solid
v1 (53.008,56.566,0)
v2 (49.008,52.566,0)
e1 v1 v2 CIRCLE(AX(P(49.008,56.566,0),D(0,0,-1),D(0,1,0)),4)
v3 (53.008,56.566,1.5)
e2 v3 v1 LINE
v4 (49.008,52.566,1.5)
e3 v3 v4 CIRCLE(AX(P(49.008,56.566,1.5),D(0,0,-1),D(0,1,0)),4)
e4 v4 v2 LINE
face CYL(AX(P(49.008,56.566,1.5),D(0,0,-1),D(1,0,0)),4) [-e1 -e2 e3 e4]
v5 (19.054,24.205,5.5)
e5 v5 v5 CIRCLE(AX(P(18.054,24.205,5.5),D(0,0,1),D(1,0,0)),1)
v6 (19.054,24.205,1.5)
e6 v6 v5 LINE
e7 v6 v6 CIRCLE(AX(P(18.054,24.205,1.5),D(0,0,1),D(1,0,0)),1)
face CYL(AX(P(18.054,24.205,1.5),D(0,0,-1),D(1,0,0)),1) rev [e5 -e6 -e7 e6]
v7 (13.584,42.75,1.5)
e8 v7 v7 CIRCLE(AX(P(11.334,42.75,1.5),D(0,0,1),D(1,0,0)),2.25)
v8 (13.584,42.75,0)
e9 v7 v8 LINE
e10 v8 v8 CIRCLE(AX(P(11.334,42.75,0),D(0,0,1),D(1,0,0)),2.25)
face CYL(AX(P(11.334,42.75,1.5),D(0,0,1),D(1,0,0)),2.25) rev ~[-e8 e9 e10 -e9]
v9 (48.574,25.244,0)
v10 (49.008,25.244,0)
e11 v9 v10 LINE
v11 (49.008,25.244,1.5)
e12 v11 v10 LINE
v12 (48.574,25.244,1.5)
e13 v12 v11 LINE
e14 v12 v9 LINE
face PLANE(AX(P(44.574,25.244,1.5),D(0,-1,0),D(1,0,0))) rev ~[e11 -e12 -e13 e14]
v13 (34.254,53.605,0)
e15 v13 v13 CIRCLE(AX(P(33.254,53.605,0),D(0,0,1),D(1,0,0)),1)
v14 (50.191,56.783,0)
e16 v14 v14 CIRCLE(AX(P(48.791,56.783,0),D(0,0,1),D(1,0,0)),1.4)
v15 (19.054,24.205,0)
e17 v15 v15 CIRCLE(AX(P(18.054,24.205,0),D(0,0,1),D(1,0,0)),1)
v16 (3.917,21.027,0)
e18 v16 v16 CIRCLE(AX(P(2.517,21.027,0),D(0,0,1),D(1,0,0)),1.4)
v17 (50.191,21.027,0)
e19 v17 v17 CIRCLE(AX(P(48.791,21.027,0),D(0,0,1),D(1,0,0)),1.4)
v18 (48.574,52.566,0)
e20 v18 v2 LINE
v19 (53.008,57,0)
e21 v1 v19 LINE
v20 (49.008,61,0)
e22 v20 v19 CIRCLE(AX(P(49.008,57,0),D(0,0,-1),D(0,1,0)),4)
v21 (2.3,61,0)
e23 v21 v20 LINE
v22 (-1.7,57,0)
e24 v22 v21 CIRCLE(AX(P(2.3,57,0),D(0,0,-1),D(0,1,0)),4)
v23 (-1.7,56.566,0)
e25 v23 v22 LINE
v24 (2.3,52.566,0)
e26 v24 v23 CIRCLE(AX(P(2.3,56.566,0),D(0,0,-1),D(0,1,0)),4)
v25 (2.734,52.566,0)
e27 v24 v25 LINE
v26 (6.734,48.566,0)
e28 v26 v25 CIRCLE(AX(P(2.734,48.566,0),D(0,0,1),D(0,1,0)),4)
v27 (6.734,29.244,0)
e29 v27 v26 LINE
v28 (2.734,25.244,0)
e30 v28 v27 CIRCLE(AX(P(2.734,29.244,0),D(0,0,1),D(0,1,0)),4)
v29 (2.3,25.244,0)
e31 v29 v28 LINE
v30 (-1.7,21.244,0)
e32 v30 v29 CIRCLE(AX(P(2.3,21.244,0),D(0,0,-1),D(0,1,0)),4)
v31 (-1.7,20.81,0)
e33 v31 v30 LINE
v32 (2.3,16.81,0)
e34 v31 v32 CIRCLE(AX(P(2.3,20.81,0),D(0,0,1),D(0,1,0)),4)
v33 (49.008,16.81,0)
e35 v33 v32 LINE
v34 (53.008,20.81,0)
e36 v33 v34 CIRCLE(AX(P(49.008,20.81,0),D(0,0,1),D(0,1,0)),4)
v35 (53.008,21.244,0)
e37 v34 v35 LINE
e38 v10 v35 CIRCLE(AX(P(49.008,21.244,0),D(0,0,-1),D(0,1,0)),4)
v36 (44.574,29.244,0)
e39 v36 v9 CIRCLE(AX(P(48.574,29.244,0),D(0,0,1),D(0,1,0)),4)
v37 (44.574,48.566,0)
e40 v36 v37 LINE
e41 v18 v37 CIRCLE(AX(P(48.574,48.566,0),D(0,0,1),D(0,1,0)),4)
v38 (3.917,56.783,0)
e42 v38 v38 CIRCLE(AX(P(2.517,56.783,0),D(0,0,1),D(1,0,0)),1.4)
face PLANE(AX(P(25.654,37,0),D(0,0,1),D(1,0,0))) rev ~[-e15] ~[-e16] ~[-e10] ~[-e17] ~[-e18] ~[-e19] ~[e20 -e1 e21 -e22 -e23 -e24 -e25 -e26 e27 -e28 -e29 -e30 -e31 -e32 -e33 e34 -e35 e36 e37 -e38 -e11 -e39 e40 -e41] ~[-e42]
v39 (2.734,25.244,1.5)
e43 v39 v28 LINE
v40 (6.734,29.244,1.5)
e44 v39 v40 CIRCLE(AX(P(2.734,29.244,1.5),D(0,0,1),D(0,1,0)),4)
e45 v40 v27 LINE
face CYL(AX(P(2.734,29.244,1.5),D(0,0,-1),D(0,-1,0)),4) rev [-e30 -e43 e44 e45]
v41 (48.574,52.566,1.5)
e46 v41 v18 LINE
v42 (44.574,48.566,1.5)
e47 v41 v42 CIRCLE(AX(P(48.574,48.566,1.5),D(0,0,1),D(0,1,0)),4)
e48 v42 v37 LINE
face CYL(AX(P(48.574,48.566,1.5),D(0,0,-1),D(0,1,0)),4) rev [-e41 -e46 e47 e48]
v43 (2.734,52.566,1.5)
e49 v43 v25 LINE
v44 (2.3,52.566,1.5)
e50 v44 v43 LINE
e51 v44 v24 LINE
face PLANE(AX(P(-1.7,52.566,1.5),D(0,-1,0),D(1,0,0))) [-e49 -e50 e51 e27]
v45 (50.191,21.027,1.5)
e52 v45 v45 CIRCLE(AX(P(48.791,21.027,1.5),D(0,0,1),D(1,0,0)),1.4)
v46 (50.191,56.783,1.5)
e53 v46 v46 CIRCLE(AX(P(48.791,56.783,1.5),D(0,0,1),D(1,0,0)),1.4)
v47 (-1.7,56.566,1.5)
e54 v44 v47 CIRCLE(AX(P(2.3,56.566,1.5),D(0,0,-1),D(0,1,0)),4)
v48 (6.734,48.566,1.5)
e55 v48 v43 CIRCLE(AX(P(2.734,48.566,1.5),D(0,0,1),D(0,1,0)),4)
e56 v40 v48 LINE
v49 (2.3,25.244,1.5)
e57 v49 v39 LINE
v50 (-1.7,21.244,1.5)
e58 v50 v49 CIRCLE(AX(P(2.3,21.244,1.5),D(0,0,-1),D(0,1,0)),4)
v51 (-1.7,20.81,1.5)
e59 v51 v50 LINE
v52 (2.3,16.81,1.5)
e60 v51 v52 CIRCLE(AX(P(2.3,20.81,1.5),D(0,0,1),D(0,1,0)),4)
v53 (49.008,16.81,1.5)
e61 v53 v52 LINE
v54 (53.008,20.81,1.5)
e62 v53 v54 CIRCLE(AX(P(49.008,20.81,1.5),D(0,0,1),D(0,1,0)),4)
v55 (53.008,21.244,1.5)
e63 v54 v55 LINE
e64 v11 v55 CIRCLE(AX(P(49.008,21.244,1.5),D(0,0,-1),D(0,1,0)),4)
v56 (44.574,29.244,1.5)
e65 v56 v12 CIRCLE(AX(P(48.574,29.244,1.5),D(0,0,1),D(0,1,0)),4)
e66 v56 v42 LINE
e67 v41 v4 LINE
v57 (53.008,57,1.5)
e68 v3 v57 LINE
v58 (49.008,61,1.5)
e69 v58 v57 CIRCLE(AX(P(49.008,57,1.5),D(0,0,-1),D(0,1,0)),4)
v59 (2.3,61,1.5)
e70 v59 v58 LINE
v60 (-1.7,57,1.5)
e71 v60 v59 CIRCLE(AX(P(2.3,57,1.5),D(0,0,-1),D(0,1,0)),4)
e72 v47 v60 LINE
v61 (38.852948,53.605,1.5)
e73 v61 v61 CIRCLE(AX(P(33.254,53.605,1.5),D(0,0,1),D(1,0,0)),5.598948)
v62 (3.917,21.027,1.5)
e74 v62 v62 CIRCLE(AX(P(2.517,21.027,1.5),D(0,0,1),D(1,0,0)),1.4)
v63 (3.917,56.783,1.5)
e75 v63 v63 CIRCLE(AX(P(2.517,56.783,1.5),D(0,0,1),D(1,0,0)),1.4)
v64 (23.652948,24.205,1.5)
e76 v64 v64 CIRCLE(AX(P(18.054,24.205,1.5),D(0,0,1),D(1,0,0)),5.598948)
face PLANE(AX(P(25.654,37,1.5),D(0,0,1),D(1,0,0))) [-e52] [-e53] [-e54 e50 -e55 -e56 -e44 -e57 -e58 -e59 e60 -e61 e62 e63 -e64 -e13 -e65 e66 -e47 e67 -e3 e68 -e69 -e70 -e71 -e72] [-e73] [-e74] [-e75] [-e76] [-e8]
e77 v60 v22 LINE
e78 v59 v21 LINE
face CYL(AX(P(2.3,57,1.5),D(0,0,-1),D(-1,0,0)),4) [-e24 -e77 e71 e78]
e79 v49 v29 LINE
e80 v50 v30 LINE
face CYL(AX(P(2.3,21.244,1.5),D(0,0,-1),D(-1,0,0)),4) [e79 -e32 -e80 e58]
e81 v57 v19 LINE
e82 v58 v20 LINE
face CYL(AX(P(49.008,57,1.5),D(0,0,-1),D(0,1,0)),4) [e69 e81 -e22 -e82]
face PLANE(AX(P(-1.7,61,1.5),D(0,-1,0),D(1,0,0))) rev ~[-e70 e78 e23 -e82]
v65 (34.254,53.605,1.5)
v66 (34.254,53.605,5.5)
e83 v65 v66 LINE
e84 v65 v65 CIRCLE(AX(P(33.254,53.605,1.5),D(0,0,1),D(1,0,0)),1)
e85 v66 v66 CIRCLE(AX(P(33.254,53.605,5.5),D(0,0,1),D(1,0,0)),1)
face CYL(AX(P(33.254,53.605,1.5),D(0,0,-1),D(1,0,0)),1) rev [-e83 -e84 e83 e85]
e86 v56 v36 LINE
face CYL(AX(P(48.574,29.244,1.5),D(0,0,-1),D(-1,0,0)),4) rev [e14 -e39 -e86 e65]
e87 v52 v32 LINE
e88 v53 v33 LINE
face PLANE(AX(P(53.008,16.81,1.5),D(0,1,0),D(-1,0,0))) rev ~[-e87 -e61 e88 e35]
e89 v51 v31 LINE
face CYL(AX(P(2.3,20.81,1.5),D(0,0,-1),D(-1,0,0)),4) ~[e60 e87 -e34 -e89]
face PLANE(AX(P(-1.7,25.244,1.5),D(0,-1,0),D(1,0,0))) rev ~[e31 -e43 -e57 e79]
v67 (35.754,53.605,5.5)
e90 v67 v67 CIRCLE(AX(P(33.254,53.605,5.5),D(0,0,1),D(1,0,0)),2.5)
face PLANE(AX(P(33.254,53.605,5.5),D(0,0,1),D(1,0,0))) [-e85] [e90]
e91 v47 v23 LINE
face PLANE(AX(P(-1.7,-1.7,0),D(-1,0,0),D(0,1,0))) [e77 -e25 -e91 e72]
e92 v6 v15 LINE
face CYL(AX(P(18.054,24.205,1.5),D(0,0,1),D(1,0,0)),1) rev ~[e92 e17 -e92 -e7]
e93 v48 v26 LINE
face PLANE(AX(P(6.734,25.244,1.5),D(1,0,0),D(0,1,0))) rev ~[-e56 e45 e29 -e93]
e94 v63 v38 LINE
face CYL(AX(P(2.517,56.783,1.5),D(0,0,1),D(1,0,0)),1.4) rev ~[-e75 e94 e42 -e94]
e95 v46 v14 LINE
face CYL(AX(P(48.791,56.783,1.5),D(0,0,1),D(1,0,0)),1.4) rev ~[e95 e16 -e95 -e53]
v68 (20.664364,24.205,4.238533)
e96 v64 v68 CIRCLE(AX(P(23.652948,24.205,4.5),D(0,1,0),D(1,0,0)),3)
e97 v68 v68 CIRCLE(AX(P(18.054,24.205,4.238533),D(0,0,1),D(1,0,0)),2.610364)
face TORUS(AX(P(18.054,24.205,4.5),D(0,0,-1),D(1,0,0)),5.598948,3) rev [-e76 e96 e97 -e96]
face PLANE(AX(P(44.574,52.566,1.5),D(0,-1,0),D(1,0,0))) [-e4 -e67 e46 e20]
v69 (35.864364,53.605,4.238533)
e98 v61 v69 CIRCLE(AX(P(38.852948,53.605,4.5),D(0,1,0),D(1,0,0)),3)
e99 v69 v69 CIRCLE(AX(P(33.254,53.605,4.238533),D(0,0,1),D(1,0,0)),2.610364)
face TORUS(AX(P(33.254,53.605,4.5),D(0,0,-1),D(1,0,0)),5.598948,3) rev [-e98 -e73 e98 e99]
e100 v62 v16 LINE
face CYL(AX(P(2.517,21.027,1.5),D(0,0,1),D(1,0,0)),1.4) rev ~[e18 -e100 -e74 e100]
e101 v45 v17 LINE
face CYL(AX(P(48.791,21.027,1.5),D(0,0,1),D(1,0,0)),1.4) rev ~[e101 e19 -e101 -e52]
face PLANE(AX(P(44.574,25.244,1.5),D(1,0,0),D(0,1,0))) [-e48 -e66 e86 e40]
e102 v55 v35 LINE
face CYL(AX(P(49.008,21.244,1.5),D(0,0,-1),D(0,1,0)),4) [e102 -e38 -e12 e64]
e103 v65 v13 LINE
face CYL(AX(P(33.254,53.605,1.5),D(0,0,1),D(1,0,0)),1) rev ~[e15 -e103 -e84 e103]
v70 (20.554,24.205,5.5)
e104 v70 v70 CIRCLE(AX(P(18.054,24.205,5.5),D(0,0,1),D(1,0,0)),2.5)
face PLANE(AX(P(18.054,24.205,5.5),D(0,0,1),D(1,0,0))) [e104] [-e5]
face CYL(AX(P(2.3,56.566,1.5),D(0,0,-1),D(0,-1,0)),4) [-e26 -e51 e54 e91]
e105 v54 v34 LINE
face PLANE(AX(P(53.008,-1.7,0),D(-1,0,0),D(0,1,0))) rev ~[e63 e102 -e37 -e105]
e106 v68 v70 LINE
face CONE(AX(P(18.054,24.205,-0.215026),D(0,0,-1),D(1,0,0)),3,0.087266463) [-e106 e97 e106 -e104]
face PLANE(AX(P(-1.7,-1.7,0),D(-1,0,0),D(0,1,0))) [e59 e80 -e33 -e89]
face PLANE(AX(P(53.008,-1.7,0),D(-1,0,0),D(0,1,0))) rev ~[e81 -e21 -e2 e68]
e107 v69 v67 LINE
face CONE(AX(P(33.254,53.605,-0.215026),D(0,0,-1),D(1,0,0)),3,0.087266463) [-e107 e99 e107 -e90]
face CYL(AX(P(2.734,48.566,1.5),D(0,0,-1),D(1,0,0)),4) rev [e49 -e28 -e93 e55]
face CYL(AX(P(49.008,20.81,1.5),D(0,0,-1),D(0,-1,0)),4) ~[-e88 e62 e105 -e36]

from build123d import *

# Parameters (mm, degrees)
F1_W     = 54.708
F1_H     = 77.4
F2_DEPTH = 1.5
F3_W     = 8.434
F3_H     = 27.322
F3_R     = 1.4
F3_R_2   = 1
F3_R_3   = 2.25
F4_DEPTH = 1.501
F5_R     = 4
F6_R     = 3
F6_R_2   = 1
F7_DEPTH = 4
F9_R     = 3


# Not quite as in the source:
# - a fillet or chamfer that OpenCascade refuses, or shapes differently, is made with other operations: its cross-section is extruded or revolved along the edge and cut away or added


with BuildPart() as f2:
    # F1 (on face) → F2 (new body)
    with BuildSketch(Plane.XY):
        with Locations((25.654, 37)):
            Rectangle(F1_W, F1_H)
    extrude(amount=F2_DEPTH)

    # F3 (on face) → F4 (cut, through all)
    with BuildSketch(Plane.XY.offset(1.5)):
        Polygon((44.574, 16.81), (6.734, 16.81), (-1.7, 16.81), (-1.7, -1.7), (53.008, -1.7), (53.008, 16.81), align=None)
        with Locations((2.517, 38.905)):
            Rectangle(F3_W, F3_H)
        with Locations((48.791, 38.905)):
            Rectangle(F3_W, F3_H)
        Polygon((-1.7, 61), (6.734, 61), (44.574, 61), (53.008, 61), (53.008, 75.7), (-1.7, 75.7), align=None)
        with Locations((2.517, 21.027)):
            Circle(F3_R)
        with Locations((48.791, 21.027)):
            Circle(F3_R)
        with Locations((48.791, 56.783)):
            Circle(F3_R)
        with Locations((2.517, 56.783)):
            Circle(F3_R)
        with Locations((33.254, 53.605)):
            Circle(F3_R_2)
        with Locations((18.054, 24.205)):
            Circle(F3_R_2)
        with Locations((11.334, 42.75)):
            Circle(F3_R_3)
    extrude(amount=-F4_DEPTH, mode=Mode.SUBTRACT)

    # F5
    f5_edges = [f2.edges().sort_by_distance(p)[0] for p in [
        (-1.7, 61, 0.75),
        (-1.7, 52.566, 0.75),
        (-1.7, 25.244, 0.75),
        (-1.7, 16.81, 0.75),
        (6.734, 25.244, 0.75),
        (6.734, 52.566, 0.75),
        (53.008, 61, 0.75),
        (53.008, 52.566, 0.75),
        (44.574, 52.566, 0.75),
        (44.574, 25.244, 0.75),
        (53.008, 25.244, 0.75),
        (53.008, 16.81, 0.75),
    ]]
    fillet(f5_edges, radius=F5_R)

    # F6 (on face) → F7 (join)
    with BuildSketch(Plane.XY.offset(1.5)):
        with Locations((18.054, 24.205)):
            Circle(F6_R)
        with Locations((18.054, 24.205)):
            Circle(F6_R_2, mode=Mode.SUBTRACT)
        with Locations((33.254, 53.605)):
            Circle(F6_R)
        with Locations((33.254, 53.605)):
            Circle(F6_R_2, mode=Mode.SUBTRACT)
    extrude(amount=F7_DEPTH)

    # F8: chamfer of 0.5 x 5.7150261514 on 2 edges, made by hand


with BuildPart() as f8_tool2:
    # F8_s3 → F8_t4 (revolve)
    with BuildSketch(Plane.XZ.offset(-24.205)):
        Polygon((21.054, -0.2150261514), (20.554, 5.5), (21.054, 5.5), align=None)
    revolve(axis=Axis((18.054, 24.205, 5.5), (0, 0, 1)))

    split(bisect_by=Plane.XY.offset(1.5), keep=Keep.TOP)


with BuildPart() as f2_1:
    add(f2.part)

    # F8_t1: cut F8_tool2
    add(f8_tool2.part, mode=Mode.SUBTRACT)


with BuildPart() as f8_tool7:
    # F8_s8 → F8_t9 (revolve)
    with BuildSketch(Plane.XZ.offset(-53.605)):
        Polygon((36.254, -0.2150261514), (35.754, 5.5), (36.254, 5.5), align=None)
    revolve(axis=Axis((33.254, 53.605, 5.5), (0, 0, 1)))

    split(bisect_by=Plane.XY.offset(1.5), keep=Keep.TOP)


with BuildPart() as f2_2:
    add(f2_1.part)

    # F8_t6: cut F8_tool7
    add(f8_tool7.part, mode=Mode.SUBTRACT)

    # F9
    f9_edges = [f2_2.edges().sort_by_distance(p)[0] for p in [
        (15.204045, 24.205, 1.5),
        (30.404045, 53.605, 1.5),
    ]]
    fillet(f9_edges, radius=F9_R)


solid = f2_2.part
